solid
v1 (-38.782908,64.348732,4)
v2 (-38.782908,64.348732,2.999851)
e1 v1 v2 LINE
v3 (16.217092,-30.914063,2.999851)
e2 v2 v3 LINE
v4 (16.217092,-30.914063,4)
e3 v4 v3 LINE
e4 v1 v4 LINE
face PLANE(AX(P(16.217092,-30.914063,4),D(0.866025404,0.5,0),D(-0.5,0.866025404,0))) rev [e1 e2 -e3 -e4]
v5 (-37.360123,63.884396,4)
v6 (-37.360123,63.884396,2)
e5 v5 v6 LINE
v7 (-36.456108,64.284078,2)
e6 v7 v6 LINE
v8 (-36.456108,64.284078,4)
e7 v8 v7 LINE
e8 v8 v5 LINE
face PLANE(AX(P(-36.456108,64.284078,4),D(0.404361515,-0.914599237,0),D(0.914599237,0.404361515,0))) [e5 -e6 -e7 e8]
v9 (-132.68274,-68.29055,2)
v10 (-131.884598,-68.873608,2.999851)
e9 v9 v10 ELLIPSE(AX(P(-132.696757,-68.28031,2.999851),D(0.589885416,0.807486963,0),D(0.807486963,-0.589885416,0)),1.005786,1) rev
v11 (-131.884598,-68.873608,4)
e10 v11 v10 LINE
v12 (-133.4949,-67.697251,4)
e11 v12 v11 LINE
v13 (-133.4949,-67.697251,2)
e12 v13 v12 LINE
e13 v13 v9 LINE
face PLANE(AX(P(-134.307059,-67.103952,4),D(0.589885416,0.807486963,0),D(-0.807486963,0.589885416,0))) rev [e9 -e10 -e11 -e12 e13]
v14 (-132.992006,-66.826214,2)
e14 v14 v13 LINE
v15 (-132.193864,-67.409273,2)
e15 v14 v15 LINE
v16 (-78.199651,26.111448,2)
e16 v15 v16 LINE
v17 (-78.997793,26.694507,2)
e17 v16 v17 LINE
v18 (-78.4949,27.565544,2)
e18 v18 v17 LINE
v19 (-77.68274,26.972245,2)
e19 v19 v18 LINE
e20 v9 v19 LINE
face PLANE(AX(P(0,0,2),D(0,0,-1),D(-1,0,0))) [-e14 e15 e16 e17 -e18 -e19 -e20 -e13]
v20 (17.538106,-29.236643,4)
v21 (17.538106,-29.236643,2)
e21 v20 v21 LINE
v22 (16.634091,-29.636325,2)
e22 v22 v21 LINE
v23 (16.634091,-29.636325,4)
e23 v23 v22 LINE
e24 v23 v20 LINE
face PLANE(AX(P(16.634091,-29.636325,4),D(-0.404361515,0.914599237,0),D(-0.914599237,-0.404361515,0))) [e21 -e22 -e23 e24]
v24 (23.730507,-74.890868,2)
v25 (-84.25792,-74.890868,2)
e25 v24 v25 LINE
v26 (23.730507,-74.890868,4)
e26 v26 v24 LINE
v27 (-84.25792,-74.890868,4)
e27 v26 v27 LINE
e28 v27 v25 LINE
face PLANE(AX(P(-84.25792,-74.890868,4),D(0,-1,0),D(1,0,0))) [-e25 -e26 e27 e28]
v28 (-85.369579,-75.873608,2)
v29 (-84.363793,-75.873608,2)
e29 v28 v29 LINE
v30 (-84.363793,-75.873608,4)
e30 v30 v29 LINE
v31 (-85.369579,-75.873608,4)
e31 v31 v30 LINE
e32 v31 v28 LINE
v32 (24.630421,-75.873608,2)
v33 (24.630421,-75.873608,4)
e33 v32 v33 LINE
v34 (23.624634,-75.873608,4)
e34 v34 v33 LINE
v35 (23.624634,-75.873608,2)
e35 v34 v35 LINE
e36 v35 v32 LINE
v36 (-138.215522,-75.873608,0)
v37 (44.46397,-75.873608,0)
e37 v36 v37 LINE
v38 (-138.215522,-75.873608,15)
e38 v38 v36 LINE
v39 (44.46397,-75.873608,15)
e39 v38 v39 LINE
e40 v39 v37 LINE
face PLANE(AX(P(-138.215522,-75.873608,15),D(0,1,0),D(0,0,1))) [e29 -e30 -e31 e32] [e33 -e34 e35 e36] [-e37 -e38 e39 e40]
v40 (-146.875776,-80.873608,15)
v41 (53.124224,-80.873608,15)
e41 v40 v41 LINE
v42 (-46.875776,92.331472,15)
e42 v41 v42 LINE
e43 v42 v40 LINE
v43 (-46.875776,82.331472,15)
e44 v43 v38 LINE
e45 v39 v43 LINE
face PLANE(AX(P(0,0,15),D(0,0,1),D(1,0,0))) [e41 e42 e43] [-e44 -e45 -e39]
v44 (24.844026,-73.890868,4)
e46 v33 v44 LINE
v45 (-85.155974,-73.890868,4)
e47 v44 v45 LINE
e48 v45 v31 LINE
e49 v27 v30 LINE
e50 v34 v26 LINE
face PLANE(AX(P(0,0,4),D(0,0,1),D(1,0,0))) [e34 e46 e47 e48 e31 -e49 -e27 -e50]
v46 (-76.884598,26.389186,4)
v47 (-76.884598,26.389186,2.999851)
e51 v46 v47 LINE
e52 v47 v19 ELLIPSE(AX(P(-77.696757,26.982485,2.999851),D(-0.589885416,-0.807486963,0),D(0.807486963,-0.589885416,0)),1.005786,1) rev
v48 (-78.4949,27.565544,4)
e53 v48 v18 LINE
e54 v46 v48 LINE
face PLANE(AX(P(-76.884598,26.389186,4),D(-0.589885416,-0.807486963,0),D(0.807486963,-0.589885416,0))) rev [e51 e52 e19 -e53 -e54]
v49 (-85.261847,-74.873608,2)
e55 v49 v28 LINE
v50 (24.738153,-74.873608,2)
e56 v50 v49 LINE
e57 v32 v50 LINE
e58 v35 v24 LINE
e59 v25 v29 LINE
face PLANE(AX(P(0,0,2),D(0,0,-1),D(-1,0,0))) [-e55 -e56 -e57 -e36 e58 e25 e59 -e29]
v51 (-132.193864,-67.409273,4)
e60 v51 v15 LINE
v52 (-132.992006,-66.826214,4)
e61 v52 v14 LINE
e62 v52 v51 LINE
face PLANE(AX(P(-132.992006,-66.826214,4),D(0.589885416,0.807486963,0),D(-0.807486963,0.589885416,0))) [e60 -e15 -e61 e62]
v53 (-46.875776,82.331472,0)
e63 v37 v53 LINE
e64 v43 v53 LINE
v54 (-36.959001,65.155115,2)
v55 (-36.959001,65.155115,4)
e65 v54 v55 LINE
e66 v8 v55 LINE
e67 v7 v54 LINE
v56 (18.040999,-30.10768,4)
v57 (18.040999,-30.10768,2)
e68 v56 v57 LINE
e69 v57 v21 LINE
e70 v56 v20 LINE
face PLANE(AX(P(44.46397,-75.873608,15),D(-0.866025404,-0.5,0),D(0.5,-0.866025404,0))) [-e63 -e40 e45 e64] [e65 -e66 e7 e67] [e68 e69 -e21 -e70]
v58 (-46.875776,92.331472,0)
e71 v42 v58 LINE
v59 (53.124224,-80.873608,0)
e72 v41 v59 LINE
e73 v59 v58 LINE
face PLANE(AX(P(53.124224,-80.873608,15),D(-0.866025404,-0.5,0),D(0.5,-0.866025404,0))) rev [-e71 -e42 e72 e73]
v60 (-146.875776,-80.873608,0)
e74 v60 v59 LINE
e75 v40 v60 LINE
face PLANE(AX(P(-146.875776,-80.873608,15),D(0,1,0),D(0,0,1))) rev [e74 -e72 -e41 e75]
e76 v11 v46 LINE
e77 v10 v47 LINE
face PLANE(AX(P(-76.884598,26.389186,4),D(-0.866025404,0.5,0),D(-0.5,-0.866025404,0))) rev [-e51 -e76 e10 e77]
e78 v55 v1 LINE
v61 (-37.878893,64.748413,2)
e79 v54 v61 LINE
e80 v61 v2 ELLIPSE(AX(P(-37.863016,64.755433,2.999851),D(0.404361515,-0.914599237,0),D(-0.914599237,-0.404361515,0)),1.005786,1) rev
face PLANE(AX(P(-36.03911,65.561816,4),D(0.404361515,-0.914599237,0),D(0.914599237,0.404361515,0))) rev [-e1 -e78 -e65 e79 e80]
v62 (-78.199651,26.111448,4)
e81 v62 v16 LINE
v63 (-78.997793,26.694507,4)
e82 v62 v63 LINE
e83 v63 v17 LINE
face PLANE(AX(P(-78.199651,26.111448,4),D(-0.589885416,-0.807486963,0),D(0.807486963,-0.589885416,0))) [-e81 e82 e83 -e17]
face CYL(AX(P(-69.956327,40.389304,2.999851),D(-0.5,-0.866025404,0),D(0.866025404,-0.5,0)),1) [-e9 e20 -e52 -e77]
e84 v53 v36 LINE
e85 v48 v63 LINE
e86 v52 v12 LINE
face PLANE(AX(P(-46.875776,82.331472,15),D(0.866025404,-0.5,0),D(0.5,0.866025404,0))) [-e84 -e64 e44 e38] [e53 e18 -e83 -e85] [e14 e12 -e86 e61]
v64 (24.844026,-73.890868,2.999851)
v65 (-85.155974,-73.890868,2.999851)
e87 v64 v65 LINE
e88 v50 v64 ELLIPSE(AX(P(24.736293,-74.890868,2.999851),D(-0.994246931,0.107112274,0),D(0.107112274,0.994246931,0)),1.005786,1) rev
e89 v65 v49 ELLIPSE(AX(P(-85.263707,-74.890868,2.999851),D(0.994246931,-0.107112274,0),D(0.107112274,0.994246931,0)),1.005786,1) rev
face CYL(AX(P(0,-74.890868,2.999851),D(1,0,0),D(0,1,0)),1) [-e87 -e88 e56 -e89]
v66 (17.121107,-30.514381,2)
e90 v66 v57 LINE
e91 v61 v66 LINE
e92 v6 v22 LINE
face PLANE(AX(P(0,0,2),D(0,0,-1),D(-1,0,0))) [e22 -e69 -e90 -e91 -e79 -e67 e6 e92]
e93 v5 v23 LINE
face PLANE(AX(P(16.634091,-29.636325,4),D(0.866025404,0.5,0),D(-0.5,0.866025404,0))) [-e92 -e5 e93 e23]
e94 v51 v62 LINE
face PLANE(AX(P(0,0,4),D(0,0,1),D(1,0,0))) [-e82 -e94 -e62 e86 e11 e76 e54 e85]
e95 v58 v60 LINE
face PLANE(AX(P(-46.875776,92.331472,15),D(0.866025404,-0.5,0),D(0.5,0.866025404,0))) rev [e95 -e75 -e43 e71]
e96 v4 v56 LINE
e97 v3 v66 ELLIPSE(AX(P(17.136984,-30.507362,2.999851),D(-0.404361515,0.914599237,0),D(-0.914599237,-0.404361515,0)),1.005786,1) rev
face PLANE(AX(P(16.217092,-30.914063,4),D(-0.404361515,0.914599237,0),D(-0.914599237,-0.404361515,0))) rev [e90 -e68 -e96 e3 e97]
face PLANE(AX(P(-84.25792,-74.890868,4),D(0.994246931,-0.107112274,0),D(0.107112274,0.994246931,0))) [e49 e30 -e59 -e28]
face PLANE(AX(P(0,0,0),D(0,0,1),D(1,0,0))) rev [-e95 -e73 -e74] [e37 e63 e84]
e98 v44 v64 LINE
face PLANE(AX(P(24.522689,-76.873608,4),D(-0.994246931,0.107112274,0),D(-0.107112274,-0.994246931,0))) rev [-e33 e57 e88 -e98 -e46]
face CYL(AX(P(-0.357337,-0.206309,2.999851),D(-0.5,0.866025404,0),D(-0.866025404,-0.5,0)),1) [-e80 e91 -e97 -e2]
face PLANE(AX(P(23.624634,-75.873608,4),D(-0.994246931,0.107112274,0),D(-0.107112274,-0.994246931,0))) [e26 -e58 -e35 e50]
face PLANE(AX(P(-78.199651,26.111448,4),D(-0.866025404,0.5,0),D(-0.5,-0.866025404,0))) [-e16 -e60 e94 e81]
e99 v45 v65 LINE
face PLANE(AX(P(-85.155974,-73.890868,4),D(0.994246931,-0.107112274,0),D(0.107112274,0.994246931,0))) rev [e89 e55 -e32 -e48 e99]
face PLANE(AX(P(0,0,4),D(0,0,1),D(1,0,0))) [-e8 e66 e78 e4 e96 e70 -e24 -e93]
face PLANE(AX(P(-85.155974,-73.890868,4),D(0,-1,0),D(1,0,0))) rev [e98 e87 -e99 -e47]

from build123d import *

# Parameters (mm, degrees)
BOSS_EXTRU_1_DEPTH      = 15
BOSS_EXTRU_2_DEPTH      = 2
BOSS_EXTRU_5_DEPTH      = 2
CONG_1_R                = 1
ENL_V_MAT_EXTRU_1_DEPTH = 2


with BuildPart() as part:
    # Esquisse1 → Boss.-Extru.1 (new body)
    with BuildSketch(Plane.XY):
        Polygon((-46.875775887, 92.331472327), (-146.875775887, -80.87360843), (53.124224113, -80.87360843), align=None)
        Polygon((44.463970075, -75.87360843), (-46.875775887, 82.331472327), (-138.21552185, -75.87360843), align=None, mode=Mode.SUBTRACT)
    extrude(amount=BOSS_EXTRU_1_DEPTH)

    # Esquisse2 → Boss.-Extru.2 (add)
    with BuildSketch(Plane(origin=(0, 0, 0), x_dir=(-1, 0, 0), z_dir=(0, 0, -1))):
        Polygon((-53.124224113, -80.87360843), (146.875775887, -80.87360843), (46.875775887, 92.331472327), align=None)
        Polygon((-42.731919267, -74.87360843), (136.483471042, -74.87360843), (46.875775887, 80.331472327), align=None, mode=Mode.SUBTRACT)
    extrude(amount=-BOSS_EXTRU_2_DEPTH)

    # Esquisse3 → Boss.-Extru.5 (add)
    # profile 1 of 3: a face of its own
    with BuildSketch(Plane.XY.offset(2)):
        Polygon((-76.884598102, 26.389185986), (-131.884598102, -68.87360843), (-134.307058992, -67.103952181), (-79.307058992, 28.158842235), align=None)
        Polygon((-78.199650653, 26.111448154), (-78.997792799, 26.694506994), (-132.992006441, -66.826214349), (-132.193864295, -67.409273189), align=None, mode=Mode.SUBTRACT)
    # profile 2 of 3: a face of its own
    with BuildSketch(Plane.XY.offset(2)):
        Polygon((16.217092488, -30.914062884), (18.960890201, -29.700978339), (-36.039109799, 65.561816078), (-38.782907512, 64.348731532), align=None)
        Polygon((16.634090745, -29.636325052), (17.538105586, -29.236643098), (-36.456108056, 64.284078245), (-37.360122897, 63.884396291), align=None, mode=Mode.SUBTRACT)
    # profile 3 of 3: a face of its own
    with BuildSketch(Plane.XY.offset(2)):
        Polygon((-85.155974471, -73.890867636), (-85.477311293, -76.87360843), (24.522688707, -76.87360843), (24.844025529, -73.890867636), align=None)
        Polygon((-84.257920177, -74.890867636), (-84.363792871, -75.87360843), (23.624634413, -75.87360843), (23.730507107, -74.890867636), align=None, mode=Mode.SUBTRACT)
    extrude(amount=BOSS_EXTRU_5_DEPTH)

    # Congé1
    # the kernel refuses this fillet: 1 mm, written as the material it takes off along each edge
    with BuildSketch(Plane(origin=(-40.032907512, 66.513795042, 2), x_dir=(0.8660254037844388, 0.49999999999999967, 0), z_dir=(0.49999999999999967, -0.8660254037844388, 0))) as cong_1_piece_1_section:
        with BuildLine():
            CenterArc((CONG_1_R, CONG_1_R), CONG_1_R, 180, 90)
            Line((0, CONG_1_R), (0, 0))
            Line((0, 0), (CONG_1_R, 0))
        make_face()
    cong_1_piece_1 = extrude(amount=115, mode=Mode.PRIVATE)
    cong_1_piece_1 = split(cong_1_piece_1, bisect_by=Plane(origin=(-10.431829018, 17.208704721, 2.226716308), z_dir=(-0.8660254037844386, -0.5000000000000001, 0)), keep=Keep.TOP, mode=Mode.PRIVATE)
    add(cong_1_piece_1, mode=Mode.SUBTRACT)
    with BuildSketch(Plane(origin=(-75.634598102, 28.554249495, 2), x_dir=(-0.8660254037844388, 0.4999999999999997, 0), z_dir=(-0.4999999999999997, -0.8660254037844388, 0))) as cong_1_piece_2_section:
        with BuildLine():
            CenterArc((CONG_1_R, -CONG_1_R), CONG_1_R, 90, 90)
            Line((0, -CONG_1_R), (0, 0))
            Line((0, 0), (CONG_1_R, 0))
        make_face()
    cong_1_piece_2 = extrude(amount=115, mode=Mode.PRIVATE)
    cong_1_piece_2 = split(cong_1_piece_2, bisect_by=Plane(origin=(-105.235676596, -20.750840825, 2.226716308), z_dir=(0.8660254037844387, -0.5000000000000001, 0)), keep=Keep.TOP, mode=Mode.PRIVATE)
    add(cong_1_piece_2, mode=Mode.SUBTRACT)
    with BuildSketch(Plane(origin=(27.344025529, -73.890867636, 2), x_dir=(0, -1, 0), z_dir=(-1, 0, 0))) as cong_1_piece_3_section:
        with BuildLine():
            CenterArc((CONG_1_R, CONG_1_R), CONG_1_R, 180, 90)
            Line((0, CONG_1_R), (0, 0))
            Line((0, 0), (CONG_1_R, 0))
        make_face()
    cong_1_piece_3 = extrude(amount=115, mode=Mode.PRIVATE)
    cong_1_piece_3 = split(cong_1_piece_3, bisect_by=Plane(origin=(-30.155974471, -74.87360843, 2.226716308), z_dir=(0, 1, 0)), keep=Keep.TOP, mode=Mode.PRIVATE)
    add(cong_1_piece_3, mode=Mode.SUBTRACT)

    # Esquisse3D1 → Enlèv. mat.-Extru.1 (cut)
    with BuildSketch(Plane(origin=(-138.21552185, -75.87360843, 0), x_dir=(1, 0, 0), z_dir=(0, 0, 1))):
        Polygon((0, 0), (182.679491924, 0), (91.339745962, 158.205080757), align=None)
        Polygon((1.732050808, 1), (180.947441117, 1), (91.339745962, 156.205080757), align=None, mode=Mode.SUBTRACT)
    extrude(amount=ENL_V_MAT_EXTRU_1_DEPTH, mode=Mode.SUBTRACT)


solid = part.part
